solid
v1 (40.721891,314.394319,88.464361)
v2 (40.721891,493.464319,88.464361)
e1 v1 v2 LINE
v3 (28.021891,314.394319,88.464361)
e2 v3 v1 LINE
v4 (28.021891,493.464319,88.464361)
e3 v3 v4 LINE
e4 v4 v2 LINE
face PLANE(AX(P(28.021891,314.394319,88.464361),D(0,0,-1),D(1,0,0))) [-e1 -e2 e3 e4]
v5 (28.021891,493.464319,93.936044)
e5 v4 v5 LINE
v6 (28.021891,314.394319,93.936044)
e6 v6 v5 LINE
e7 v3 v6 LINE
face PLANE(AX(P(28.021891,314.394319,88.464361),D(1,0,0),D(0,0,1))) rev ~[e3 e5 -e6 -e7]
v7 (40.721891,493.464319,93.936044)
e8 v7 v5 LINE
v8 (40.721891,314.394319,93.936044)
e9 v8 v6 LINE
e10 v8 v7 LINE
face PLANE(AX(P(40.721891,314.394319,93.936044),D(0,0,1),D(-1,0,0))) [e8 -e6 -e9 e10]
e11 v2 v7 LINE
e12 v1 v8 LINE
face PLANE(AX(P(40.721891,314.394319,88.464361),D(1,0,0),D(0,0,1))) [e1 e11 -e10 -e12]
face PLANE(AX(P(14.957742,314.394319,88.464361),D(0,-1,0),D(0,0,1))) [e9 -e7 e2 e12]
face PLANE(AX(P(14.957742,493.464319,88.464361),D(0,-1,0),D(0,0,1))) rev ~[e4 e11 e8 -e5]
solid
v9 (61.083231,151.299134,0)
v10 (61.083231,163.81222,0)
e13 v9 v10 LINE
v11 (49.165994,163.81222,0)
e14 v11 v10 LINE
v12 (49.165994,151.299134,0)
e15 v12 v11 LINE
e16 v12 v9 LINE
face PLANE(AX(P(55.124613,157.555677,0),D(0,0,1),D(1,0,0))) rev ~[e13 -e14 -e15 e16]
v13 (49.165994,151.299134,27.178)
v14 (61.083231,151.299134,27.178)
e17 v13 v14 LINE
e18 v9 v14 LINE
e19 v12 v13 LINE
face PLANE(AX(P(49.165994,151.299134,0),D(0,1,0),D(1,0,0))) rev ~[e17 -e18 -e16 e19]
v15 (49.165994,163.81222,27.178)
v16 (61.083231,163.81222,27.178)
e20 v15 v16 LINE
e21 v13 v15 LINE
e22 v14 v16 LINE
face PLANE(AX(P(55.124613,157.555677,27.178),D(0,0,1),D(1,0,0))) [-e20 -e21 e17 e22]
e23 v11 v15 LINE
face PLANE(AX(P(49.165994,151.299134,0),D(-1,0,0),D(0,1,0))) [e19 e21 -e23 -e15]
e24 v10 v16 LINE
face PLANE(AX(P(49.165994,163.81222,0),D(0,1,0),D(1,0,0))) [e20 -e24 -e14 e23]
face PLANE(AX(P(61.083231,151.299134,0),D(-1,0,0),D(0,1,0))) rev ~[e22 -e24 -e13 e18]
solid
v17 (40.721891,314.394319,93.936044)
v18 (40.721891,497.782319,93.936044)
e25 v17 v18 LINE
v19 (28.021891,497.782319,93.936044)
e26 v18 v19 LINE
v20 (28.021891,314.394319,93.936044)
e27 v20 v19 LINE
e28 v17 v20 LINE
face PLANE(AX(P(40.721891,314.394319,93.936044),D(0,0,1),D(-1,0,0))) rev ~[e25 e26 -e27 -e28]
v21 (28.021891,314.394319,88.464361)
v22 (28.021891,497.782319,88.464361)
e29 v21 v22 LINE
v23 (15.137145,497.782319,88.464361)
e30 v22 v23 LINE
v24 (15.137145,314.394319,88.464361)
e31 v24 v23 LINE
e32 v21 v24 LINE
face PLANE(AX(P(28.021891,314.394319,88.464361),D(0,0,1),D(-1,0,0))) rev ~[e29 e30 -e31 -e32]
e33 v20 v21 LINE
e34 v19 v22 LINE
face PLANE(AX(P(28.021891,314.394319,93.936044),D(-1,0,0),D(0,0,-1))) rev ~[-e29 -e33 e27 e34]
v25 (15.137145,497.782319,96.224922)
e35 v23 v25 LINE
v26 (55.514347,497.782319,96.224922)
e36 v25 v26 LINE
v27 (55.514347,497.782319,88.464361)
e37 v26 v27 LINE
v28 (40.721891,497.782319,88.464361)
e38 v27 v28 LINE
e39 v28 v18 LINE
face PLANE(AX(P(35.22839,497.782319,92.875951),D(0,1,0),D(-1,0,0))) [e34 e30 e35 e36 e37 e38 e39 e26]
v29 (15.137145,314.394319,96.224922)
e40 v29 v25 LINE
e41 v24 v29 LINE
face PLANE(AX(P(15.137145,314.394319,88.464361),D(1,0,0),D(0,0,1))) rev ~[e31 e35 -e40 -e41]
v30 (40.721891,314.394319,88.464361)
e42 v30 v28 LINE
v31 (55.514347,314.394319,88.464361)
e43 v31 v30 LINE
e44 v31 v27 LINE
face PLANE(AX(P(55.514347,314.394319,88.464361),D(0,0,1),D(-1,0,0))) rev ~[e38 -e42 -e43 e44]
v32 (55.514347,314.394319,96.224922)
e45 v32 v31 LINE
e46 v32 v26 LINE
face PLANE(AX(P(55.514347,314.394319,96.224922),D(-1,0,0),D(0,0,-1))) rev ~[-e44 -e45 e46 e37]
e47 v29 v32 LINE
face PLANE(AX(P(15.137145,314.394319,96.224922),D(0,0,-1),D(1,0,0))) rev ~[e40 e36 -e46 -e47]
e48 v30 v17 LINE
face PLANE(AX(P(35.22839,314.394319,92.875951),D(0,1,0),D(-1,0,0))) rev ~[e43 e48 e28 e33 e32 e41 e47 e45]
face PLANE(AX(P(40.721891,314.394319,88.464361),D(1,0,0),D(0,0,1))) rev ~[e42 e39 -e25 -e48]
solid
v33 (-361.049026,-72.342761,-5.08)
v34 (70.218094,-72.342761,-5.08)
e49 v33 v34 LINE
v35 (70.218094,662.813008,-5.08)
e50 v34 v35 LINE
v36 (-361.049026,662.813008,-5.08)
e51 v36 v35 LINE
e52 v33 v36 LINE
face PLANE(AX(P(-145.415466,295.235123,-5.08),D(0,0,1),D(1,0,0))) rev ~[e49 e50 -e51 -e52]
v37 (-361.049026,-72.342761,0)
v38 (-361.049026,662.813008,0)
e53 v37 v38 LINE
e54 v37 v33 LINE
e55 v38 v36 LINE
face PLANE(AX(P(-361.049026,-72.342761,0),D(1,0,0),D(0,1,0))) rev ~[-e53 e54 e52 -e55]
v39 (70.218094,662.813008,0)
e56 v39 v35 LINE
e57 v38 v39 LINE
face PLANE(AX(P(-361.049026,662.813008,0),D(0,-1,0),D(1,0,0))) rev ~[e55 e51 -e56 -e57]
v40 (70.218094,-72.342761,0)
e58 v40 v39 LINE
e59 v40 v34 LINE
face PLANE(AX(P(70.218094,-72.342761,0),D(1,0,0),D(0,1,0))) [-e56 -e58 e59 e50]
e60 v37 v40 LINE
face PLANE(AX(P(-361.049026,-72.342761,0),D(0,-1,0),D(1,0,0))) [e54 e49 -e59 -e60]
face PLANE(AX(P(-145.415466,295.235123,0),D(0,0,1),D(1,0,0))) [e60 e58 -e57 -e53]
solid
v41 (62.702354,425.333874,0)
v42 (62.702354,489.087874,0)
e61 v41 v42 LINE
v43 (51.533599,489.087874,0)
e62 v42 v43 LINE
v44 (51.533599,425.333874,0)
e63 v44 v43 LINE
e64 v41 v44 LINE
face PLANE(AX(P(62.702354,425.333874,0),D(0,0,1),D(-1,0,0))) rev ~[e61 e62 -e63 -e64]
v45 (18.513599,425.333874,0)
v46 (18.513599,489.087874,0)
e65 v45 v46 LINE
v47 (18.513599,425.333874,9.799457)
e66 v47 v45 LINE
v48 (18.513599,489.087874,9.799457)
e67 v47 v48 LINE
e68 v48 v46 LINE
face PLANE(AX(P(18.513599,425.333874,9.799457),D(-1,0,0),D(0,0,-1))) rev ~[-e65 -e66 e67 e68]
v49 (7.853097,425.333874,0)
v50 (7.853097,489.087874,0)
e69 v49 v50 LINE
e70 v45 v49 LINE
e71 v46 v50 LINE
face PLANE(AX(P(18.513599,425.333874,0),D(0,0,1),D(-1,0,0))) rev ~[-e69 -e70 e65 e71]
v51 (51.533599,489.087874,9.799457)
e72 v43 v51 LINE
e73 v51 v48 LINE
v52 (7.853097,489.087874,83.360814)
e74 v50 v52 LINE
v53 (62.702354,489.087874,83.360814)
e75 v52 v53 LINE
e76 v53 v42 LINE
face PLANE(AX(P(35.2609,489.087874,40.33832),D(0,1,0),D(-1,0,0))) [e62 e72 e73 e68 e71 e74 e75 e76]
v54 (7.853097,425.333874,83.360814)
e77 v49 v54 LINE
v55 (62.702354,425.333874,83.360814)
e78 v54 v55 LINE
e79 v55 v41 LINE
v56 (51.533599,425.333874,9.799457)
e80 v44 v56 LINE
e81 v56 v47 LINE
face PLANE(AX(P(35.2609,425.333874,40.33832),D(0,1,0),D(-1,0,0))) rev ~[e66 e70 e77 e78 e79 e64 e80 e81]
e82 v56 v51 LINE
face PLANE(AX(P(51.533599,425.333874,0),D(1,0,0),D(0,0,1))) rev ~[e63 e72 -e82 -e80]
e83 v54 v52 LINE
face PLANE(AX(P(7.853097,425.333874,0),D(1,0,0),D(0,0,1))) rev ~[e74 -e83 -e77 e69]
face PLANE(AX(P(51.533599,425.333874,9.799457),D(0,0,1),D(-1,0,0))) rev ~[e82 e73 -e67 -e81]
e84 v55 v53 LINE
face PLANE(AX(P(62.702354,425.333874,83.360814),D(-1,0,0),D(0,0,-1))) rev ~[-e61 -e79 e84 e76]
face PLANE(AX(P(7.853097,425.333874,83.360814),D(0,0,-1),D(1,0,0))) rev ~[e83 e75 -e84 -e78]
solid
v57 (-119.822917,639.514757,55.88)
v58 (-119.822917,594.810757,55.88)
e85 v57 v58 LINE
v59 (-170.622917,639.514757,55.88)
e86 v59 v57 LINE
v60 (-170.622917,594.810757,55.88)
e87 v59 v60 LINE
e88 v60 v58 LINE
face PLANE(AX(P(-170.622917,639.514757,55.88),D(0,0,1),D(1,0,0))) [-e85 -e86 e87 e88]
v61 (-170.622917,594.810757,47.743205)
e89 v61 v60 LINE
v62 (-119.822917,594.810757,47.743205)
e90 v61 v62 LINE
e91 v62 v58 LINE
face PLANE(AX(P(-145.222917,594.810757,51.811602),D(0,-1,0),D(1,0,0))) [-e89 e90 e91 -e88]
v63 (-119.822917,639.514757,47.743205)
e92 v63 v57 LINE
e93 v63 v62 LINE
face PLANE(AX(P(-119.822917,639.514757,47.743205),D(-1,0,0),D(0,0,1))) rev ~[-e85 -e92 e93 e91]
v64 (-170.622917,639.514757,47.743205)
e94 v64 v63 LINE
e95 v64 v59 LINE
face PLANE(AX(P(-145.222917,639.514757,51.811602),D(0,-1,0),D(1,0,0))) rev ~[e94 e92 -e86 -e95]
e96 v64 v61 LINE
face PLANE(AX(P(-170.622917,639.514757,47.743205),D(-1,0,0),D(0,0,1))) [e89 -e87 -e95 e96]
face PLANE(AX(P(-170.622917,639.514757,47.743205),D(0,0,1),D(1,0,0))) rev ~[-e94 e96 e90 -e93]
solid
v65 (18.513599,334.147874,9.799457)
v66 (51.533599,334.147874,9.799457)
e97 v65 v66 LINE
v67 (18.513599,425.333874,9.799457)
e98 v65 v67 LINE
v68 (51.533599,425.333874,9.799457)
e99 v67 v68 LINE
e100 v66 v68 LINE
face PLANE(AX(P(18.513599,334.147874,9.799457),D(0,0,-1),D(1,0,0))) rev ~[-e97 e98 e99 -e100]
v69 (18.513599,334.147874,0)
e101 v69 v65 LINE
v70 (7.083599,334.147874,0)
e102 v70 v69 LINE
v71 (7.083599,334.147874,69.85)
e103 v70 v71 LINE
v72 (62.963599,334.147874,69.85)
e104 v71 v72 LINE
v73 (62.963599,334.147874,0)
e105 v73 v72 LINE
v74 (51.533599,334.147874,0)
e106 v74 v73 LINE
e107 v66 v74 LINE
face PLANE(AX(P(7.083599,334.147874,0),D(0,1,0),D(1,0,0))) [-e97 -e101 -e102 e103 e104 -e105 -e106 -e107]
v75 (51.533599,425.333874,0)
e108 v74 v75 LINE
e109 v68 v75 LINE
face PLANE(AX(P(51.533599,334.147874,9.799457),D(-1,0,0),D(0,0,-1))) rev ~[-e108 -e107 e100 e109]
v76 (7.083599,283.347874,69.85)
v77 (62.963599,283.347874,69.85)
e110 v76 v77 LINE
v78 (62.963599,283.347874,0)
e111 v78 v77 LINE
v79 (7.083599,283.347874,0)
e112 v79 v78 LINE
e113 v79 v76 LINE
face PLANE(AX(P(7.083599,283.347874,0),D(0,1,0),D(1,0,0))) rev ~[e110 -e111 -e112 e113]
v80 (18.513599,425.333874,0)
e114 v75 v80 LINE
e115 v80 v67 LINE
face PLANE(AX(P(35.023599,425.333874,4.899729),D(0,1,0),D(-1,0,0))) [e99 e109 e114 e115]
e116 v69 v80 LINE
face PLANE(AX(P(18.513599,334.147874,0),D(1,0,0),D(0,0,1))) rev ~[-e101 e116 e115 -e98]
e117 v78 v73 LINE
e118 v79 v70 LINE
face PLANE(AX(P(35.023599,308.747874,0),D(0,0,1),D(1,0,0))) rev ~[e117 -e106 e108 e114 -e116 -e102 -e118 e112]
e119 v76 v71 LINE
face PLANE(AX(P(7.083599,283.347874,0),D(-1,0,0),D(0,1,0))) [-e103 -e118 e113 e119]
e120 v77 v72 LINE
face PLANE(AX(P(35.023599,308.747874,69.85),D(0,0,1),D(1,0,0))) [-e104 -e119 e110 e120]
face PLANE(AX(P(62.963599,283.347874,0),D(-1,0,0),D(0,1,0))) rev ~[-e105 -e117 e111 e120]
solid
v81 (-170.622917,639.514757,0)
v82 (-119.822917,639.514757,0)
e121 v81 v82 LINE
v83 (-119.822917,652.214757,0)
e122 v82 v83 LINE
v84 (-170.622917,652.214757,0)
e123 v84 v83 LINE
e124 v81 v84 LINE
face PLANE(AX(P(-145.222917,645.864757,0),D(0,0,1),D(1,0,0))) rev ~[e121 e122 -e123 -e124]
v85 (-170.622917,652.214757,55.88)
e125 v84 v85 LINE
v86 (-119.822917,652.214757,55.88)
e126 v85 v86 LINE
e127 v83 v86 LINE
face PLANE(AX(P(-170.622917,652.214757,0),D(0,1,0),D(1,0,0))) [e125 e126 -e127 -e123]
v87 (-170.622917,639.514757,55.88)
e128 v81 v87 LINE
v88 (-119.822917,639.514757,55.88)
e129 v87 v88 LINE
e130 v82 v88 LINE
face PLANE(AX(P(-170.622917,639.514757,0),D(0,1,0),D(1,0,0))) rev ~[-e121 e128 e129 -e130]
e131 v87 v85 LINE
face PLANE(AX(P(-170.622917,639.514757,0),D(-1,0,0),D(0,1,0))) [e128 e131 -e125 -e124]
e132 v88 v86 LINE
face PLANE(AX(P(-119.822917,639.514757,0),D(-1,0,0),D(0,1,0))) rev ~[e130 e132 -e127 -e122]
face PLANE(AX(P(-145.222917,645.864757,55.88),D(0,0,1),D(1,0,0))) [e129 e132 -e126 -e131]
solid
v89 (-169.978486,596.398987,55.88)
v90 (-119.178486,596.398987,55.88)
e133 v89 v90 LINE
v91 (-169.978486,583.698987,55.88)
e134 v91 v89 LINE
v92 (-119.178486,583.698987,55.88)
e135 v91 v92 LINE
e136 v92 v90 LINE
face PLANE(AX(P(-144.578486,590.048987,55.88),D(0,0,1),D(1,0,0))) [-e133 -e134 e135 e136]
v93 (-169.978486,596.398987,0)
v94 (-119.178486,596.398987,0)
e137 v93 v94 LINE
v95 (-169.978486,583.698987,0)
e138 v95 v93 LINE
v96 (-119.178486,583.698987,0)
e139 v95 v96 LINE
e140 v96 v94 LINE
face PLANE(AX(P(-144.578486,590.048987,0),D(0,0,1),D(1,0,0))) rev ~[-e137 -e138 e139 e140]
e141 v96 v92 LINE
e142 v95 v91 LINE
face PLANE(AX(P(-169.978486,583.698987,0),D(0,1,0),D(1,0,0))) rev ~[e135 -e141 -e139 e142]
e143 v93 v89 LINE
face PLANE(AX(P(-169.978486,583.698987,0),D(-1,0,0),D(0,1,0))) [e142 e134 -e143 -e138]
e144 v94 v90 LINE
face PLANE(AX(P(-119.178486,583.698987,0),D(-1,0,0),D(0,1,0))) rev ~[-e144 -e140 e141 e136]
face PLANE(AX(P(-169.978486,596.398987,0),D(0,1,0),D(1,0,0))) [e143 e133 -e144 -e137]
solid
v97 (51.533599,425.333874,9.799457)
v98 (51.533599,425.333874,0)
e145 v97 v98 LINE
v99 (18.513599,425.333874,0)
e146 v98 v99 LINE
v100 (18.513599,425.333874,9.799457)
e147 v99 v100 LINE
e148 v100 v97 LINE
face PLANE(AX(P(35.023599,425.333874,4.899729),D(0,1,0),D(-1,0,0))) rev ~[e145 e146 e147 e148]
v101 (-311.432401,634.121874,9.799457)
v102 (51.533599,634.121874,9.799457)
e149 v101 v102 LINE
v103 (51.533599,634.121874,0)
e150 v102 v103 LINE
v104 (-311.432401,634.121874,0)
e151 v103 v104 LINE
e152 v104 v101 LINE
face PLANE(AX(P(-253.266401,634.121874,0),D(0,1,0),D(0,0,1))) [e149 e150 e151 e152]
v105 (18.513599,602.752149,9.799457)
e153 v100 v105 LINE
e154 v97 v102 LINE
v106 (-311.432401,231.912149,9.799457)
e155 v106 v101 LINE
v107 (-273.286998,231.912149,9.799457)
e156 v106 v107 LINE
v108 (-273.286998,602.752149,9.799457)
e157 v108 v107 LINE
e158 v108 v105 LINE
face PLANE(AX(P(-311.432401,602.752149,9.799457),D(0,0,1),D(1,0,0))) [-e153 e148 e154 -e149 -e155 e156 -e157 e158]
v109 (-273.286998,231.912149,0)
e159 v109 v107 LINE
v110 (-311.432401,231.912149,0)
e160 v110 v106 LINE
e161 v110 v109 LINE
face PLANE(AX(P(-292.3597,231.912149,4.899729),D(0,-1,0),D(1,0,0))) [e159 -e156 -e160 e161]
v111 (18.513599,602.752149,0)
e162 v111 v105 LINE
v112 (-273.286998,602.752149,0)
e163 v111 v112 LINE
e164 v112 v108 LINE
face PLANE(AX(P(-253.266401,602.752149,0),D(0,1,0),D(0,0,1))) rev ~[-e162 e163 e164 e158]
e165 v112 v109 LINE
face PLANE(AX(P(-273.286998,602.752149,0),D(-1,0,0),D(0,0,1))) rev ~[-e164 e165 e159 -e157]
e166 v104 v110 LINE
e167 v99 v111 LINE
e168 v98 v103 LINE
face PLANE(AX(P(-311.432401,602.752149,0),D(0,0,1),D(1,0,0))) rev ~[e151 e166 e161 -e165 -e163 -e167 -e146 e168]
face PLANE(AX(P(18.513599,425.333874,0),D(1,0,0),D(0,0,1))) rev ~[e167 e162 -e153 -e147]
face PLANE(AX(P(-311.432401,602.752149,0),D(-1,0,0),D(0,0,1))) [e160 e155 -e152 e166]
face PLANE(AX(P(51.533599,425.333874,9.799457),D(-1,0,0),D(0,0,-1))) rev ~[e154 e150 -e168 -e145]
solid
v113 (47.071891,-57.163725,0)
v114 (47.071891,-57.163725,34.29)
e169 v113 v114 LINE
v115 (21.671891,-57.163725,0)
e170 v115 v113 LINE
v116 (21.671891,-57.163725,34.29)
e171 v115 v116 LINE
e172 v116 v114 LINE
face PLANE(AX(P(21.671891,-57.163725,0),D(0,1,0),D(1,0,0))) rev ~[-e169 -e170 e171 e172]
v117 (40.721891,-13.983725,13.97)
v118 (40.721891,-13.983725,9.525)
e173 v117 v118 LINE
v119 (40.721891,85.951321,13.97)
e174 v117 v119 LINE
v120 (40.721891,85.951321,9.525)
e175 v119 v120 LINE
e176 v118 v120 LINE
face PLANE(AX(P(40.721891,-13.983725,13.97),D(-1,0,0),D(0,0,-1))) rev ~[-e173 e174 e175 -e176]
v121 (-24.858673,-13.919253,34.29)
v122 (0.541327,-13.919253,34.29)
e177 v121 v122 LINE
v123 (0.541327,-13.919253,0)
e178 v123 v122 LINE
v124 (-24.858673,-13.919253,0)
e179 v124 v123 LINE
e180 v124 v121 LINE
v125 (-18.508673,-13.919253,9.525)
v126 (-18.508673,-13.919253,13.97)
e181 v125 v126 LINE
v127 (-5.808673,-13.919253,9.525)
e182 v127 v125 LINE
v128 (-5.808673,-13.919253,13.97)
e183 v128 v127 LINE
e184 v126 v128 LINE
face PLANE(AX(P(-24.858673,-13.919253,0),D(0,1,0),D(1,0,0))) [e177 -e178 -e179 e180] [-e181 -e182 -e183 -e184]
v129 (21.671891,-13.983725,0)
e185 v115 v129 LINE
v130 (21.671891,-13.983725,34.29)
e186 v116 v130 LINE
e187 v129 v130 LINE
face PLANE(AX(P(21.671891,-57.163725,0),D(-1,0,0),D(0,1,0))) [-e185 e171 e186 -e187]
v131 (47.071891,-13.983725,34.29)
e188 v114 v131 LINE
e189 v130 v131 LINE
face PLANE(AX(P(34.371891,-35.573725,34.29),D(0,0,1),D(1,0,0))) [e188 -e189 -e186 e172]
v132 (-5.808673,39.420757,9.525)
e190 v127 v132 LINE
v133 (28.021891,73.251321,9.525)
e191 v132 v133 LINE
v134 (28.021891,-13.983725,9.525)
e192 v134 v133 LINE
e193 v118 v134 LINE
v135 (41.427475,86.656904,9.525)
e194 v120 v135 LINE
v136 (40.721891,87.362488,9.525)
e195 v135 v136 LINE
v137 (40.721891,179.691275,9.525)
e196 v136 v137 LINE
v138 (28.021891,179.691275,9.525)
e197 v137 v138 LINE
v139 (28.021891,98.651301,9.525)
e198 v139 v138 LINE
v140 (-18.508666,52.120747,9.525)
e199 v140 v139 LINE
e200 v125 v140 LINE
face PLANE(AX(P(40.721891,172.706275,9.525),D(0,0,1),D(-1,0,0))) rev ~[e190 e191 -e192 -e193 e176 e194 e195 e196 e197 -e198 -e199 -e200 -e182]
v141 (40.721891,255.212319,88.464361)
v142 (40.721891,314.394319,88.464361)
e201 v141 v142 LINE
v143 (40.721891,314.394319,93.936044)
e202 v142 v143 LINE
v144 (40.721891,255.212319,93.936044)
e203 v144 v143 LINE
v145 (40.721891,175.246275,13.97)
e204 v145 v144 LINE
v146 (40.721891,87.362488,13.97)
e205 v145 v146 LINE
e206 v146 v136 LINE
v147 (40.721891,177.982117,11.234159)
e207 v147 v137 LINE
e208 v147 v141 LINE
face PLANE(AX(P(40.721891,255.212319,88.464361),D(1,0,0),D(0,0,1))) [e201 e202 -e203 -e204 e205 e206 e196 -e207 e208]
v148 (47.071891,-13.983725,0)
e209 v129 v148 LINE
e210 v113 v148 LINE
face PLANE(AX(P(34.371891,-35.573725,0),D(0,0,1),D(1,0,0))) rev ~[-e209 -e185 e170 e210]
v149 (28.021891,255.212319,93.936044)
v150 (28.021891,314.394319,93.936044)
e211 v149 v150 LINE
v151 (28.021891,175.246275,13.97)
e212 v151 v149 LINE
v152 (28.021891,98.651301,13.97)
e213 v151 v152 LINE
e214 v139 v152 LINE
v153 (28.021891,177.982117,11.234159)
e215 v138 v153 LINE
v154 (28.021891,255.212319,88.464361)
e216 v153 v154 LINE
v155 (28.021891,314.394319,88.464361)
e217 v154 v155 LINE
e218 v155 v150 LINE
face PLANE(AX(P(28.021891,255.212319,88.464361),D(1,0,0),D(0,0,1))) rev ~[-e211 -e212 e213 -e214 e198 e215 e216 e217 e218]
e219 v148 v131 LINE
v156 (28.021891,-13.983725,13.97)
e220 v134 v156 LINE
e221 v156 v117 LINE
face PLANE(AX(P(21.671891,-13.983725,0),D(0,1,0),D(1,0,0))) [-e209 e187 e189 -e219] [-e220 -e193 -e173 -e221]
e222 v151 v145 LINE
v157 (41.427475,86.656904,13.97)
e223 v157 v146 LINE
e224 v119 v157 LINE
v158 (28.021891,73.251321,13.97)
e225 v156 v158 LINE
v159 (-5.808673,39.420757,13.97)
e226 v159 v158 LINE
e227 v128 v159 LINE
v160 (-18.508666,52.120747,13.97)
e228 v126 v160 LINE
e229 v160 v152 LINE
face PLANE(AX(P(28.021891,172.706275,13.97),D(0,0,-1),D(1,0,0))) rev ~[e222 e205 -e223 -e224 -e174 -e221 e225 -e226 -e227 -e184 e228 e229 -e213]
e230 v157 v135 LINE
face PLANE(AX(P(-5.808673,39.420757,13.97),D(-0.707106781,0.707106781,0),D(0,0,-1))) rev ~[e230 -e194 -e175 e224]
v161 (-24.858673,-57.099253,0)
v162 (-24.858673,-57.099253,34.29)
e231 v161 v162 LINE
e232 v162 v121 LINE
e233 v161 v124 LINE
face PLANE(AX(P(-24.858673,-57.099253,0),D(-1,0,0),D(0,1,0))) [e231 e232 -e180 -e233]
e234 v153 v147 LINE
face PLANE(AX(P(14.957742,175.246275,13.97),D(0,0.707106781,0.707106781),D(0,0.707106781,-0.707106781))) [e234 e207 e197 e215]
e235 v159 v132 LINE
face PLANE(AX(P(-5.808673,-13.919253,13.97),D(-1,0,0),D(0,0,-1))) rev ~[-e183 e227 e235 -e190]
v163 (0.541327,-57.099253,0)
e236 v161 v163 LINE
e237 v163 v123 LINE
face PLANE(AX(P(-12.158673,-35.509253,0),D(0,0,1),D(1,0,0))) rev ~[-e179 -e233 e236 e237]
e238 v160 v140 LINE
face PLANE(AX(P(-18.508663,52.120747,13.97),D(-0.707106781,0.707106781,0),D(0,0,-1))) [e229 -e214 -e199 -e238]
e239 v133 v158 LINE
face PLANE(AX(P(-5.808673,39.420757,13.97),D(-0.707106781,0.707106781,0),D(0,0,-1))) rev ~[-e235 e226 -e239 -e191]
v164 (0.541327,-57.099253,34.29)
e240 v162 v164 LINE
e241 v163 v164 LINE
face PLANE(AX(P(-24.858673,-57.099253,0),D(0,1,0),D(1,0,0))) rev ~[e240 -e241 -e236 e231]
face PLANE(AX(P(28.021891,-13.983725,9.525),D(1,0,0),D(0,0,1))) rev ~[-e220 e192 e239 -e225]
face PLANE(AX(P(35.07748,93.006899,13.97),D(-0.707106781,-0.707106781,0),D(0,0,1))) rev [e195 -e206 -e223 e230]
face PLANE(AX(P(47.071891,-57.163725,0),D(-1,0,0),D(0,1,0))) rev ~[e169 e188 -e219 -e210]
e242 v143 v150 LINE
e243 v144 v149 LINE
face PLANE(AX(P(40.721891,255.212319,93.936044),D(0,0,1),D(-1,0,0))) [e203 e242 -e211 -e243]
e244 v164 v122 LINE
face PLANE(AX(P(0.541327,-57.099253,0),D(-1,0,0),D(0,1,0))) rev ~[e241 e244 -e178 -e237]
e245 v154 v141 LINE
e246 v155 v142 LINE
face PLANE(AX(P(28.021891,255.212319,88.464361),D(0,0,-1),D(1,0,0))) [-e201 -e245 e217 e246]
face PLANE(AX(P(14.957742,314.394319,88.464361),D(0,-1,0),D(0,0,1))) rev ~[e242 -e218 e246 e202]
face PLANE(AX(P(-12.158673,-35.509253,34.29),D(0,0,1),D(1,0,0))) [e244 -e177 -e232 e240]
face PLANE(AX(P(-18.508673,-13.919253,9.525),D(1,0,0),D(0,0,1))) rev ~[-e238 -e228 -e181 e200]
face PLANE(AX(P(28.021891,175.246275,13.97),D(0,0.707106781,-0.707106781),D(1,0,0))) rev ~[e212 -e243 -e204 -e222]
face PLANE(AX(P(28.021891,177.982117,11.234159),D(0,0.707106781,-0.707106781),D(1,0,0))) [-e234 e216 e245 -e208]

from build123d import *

# Parameters (mm, degrees)
F0_W         = 25.4
F0_H         = 43.18
F1_DEPTH     = 34.29
F4_DEPTH     = 186.69
F5_DEPTH     = 66.04
F6_SIZE      = 12.69999
F7_DEPTH     = 66.802
F8_W         = 11.9172371924
F8_H         = 12.5130861998
F9_DEPTH     = 27.178
F10_DEPTH    = 7.62
F11_T1_DEPTH = 38.8282991577
F12_W        = 12.7
F12_H        = 3.8690640952
F13_DEPTH    = 114.3
F14_T1_DEPTH = 38.8282991577
F15_DEPTH    = 59.182
F16_W        = 55.88
F16_H        = 50.8
F17_DEPTH    = 69.85
F19_DEPTH    = 91.186
F21_DEPTH    = 63.754
F22_DEPTH    = 208.788
F24_DEPTH    = 183.388
F25_DEPTH    = 179.07
F26_W        = 31.3697251636
F26_H        = 9.7994571552
F27_DEPTH    = 271.78
F28_DEPTH    = 58.166
F29_W        = 38.1454027963
F29_H        = 9.7994571552
F30_DEPTH    = 370.84
F31_W        = 50.8
F31_H        = 12.7
F32_DEPTH    = 55.88
F33_W        = 50.8
F33_H        = 8.1367950189
F34_DEPTH    = 44.704
F35_W        = 431.2671199441
F35_H        = 735.1557686925
F36_DEPTH    = 5.08


# Not quite as in the source:
# - a fillet or chamfer that OpenCascade refuses, or shapes differently, is made with other operations: its cross-section is extruded or revolved along the edge and cut away or added
# - a fillet or chamfer is up to 0.001 mm smaller than in the source, because OpenCascade refuses the exact size


with BuildPart() as f1:
    # F0 (on Top) → F1 (new body)
    with BuildSketch(Plane.XY):
        with Locations((-12.1586725817, -35.5092528684)):
            Rectangle(F0_W, F0_H)
    extrude(amount=F1_DEPTH)

    # F3 (on face) → F5 (join)
    with BuildSketch(Plane(origin=(0, -13.9192528684, 0), x_dir=(-1, 0, 0), z_dir=(0, 1, 0))):
        Polygon((12.1586725817, 13.97), (5.8086725817, 13.97), (5.8086725817, 9.525), (12.1586725817, 9.525), (18.5086725817, 9.525), (18.5086725817, 11.7475), (18.5086725817, 13.97), align=None)
    extrude(amount=F5_DEPTH)

    # F6 (size 12.7 in the source; OpenCascade refuses exactly that, so slightly less here)
    f6_edges = [f1.edges().sort_by_distance(p)[0] for p in [
        (-5.808673, 52.120747, 11.7475),
    ]]
    chamfer(f6_edges, length=F6_SIZE)

    # F7 (add): a face of the model
    f7_faces = [f1.faces().sort_by_distance(p)[0] for p in [
        (-12.1586675817, 45.7707521316, 11.7475),
    ]]


with BuildPart() as f1b:
    # F0 (on Top) → F1, piece 2 (new body)
    with BuildSketch(Plane.XY):
        with Locations((34.3718913153, -35.5737248565)):
            Rectangle(F0_W, F0_H)
    extrude(amount=F1_DEPTH)

    # F2 (on face) → F4 (join)
    with BuildSketch(Plane(origin=(0, -13.9837248565, 0), x_dir=(-1, 0, 0), z_dir=(0, 1, 0))):
        Polygon((-34.3718913153, 13.97), (-40.7218913153, 13.97), (-40.7218913153, 9.525), (-34.3718913153, 9.525), (-28.0218913153, 9.525), (-28.0218913153, 11.7475), (-28.0218913153, 13.97), align=None)
    extrude(amount=F4_DEPTH)


with BuildPart() as f1_1:
    add(f1.part)

    add(f1b.part)  # F7 merges F1b
    extrude(f7_faces, amount=F7_DEPTH)

    # F10 (add): a face of the model
    f10_faces = [f1_1.faces().sort_by_distance(p)[0] for p in [
        (34.3718913153, 172.7062751435, 11.7475),
    ]]
    extrude(f10_faces, amount=F10_DEPTH)

    # F11: chamfer of 5.08 on 1 edges, made by hand

    # F11_s2 → F11_t1 (cut)
    with BuildSketch(Plane.YZ.offset(14.9577417365)):
        Polygon((175.2462751435, 13.97), (180.3262751435, 8.89), (180.3262751435, 13.97), align=None)
    extrude(amount=F11_T1_DEPTH, mode=Mode.SUBTRACT)

    # F12 (on face) → F13 (join)
    with BuildSketch(Plane(origin=(0, 94.6081375717, 94.6081375717), x_dir=(1, 0, 0), z_dir=(0, 0.7071067812, 0.7071067812))):
        with Locations((34.3718913153, 115.9740798461)):
            Rectangle(F12_W, F12_H)
    extrude(amount=F13_DEPTH)

    # F14: chamfer of 5.08 on 1 edges, made by hand

    # F14_s2 → F14_t1 (cut)
    with BuildSketch(Plane.YZ.offset(14.9577417365)):
        Polygon((255.2123192432, 88.4643611826), (255.2123192432, 95.6485660795), (258.8044216917, 92.0564636311), align=None)
    extrude(amount=F14_T1_DEPTH, mode=Mode.SUBTRACT)

    # F15 (add): a face of the model
    f15_faces = [f1_1.faces().sort_by_distance(p)[0] for p in [
        (34.3718913153, 255.2123192432, 91.2002026412),
    ]]
    extrude(f15_faces, amount=F15_DEPTH)


with BuildPart() as f9:
    # F8 (on Top) → F9 (new body)
    with BuildSketch(Plane.XY):
        with Locations((55.1246125251, 157.5556769967)):
            Rectangle(F8_W, F8_H)
    extrude(amount=F9_DEPTH)


with BuildPart() as f17:
    # F16 (on Top) → F17 (new body)
    with BuildSketch(Plane.XY):
        with Locations((35.0235989317, 308.7478742687)):
            Rectangle(F16_W, F16_H)
    extrude(amount=F17_DEPTH)

    # F18 (on face) → F19 (join)
    with BuildSketch(Plane(origin=(0, 334.1478742687, 0), x_dir=(-1, 0, 0), z_dir=(0, 1, 0))):
        Polygon((-51.5335989317, 4.8997285776), (-51.5335989317, 0), (-18.5135989317, 0), (-18.5135989317, 4.8997285776), (-18.5135989317, 9.7994571552), (-51.5335989317, 9.7994571552), align=None)
    extrude(amount=F19_DEPTH)


with BuildPart() as f21:
    # F20 (on face) → F21 (new body)
    with BuildSketch(Plane(origin=(0, 425.3338742687, 0), x_dir=(-1, 0, 0), z_dir=(0, 1, 0))):
        Polygon((-7.8530972824, 83.3608135581), (-62.7023540437, 83.3608135581), (-62.7023540437, 0), (-51.5335989317, 0), (-51.5335989317, 9.7994571552), (-18.5135989317, 9.7994571552), (-18.5135989317, 0), (-7.8530972824, 0), align=None)
    extrude(amount=F21_DEPTH)


with BuildPart() as f22:
    # F22 (new): a face of the model
    f22_faces = [f17.part.faces().sort_by_distance(p)[0] for p in [
        (35.0235989317, 425.3338742687, 4.8997285776),
    ]]
    extrude(f22_faces, amount=F22_DEPTH)

    # F26 (on face) → F27 (join)
    with BuildSketch(Plane(origin=(18.5135989317, 0, 0), x_dir=(0, -1, 0), z_dir=(-1, 0, 0))):
        with Locations((-618.4370116869, 4.8997285776)):
            Rectangle(F26_W, F26_H)
    extrude(amount=F27_DEPTH)

    # F28 (add): a face of the model
    f28_faces = [f22.faces().sort_by_distance(p)[0] for p in [
        (-253.2664010683, 618.4370116869, 4.8997285776),
    ]]
    extrude(f28_faces, amount=F28_DEPTH)

    # F29 (on face) → F30 (join)
    with BuildSketch(Plane.XZ.offset(-602.7521491051)):
        with Locations((-292.3596996701, 4.8997285776)):
            Rectangle(F29_W, F29_H)
    extrude(amount=F30_DEPTH)


with BuildPart() as f24:
    # F23 (on face) → F24 (new body)
    with BuildSketch(Plane(origin=(0, 314.3943192432, 0), x_dir=(-1, 0, 0), z_dir=(0, 1, 0))):
        Polygon((-15.1371452957, 96.2249219918), (-55.5143468082, 96.2249219918), (-55.5143468082, 88.4643611826), (-40.7218913153, 88.4643611826), (-40.7218913153, 93.9360440997), (-28.0218913153, 93.9360440997), (-28.0218913153, 88.4643611826), (-15.1371452957, 88.4643611826), align=None)
    extrude(amount=F24_DEPTH)


with BuildPart() as f25:
    # F25 (new): a face of the model
    f25_faces = [f1_1.part.faces().sort_by_distance(p)[0] for p in [
        (34.3718913153, 314.3943192432, 91.2002026412),
    ]]
    extrude(f25_faces, amount=F25_DEPTH)


with BuildPart() as f32:
    # F31 (on Top) → F32 (new body)
    with BuildSketch(Plane.XY):
        with Locations((-145.2229168913, 645.8647573679)):
            Rectangle(F31_W, F31_H)
    extrude(amount=F32_DEPTH)


with BuildPart() as f32b:
    # F31 (on Top) → F32, piece 2 (new body)
    with BuildSketch(Plane.XY):
        with Locations((-144.5784862739, 590.0489869958)):
            Rectangle(F31_W, F31_H)
    extrude(amount=F32_DEPTH)


with BuildPart() as f34:
    # F33 (on face) → F34 (new body)
    with BuildSketch(Plane.XZ.offset(-639.5147573679)):
        with Locations((-145.2229168913, 51.8116024905)):
            Rectangle(F33_W, F33_H)
    extrude(amount=F34_DEPTH)


with BuildPart() as f36:
    # F35 (on Top) → F36 (new body)
    with BuildSketch(Plane.XY):
        with Locations((-145.4154662788, 295.2351234853)):
            Rectangle(F35_W, F35_H)
    extrude(amount=-F36_DEPTH)


solid = Compound([f1_1.part, f9.part, f17.part, f21.part, f22.part, f24.part, f25.part, f32.part, f32b.part, f34.part, f36.part])
